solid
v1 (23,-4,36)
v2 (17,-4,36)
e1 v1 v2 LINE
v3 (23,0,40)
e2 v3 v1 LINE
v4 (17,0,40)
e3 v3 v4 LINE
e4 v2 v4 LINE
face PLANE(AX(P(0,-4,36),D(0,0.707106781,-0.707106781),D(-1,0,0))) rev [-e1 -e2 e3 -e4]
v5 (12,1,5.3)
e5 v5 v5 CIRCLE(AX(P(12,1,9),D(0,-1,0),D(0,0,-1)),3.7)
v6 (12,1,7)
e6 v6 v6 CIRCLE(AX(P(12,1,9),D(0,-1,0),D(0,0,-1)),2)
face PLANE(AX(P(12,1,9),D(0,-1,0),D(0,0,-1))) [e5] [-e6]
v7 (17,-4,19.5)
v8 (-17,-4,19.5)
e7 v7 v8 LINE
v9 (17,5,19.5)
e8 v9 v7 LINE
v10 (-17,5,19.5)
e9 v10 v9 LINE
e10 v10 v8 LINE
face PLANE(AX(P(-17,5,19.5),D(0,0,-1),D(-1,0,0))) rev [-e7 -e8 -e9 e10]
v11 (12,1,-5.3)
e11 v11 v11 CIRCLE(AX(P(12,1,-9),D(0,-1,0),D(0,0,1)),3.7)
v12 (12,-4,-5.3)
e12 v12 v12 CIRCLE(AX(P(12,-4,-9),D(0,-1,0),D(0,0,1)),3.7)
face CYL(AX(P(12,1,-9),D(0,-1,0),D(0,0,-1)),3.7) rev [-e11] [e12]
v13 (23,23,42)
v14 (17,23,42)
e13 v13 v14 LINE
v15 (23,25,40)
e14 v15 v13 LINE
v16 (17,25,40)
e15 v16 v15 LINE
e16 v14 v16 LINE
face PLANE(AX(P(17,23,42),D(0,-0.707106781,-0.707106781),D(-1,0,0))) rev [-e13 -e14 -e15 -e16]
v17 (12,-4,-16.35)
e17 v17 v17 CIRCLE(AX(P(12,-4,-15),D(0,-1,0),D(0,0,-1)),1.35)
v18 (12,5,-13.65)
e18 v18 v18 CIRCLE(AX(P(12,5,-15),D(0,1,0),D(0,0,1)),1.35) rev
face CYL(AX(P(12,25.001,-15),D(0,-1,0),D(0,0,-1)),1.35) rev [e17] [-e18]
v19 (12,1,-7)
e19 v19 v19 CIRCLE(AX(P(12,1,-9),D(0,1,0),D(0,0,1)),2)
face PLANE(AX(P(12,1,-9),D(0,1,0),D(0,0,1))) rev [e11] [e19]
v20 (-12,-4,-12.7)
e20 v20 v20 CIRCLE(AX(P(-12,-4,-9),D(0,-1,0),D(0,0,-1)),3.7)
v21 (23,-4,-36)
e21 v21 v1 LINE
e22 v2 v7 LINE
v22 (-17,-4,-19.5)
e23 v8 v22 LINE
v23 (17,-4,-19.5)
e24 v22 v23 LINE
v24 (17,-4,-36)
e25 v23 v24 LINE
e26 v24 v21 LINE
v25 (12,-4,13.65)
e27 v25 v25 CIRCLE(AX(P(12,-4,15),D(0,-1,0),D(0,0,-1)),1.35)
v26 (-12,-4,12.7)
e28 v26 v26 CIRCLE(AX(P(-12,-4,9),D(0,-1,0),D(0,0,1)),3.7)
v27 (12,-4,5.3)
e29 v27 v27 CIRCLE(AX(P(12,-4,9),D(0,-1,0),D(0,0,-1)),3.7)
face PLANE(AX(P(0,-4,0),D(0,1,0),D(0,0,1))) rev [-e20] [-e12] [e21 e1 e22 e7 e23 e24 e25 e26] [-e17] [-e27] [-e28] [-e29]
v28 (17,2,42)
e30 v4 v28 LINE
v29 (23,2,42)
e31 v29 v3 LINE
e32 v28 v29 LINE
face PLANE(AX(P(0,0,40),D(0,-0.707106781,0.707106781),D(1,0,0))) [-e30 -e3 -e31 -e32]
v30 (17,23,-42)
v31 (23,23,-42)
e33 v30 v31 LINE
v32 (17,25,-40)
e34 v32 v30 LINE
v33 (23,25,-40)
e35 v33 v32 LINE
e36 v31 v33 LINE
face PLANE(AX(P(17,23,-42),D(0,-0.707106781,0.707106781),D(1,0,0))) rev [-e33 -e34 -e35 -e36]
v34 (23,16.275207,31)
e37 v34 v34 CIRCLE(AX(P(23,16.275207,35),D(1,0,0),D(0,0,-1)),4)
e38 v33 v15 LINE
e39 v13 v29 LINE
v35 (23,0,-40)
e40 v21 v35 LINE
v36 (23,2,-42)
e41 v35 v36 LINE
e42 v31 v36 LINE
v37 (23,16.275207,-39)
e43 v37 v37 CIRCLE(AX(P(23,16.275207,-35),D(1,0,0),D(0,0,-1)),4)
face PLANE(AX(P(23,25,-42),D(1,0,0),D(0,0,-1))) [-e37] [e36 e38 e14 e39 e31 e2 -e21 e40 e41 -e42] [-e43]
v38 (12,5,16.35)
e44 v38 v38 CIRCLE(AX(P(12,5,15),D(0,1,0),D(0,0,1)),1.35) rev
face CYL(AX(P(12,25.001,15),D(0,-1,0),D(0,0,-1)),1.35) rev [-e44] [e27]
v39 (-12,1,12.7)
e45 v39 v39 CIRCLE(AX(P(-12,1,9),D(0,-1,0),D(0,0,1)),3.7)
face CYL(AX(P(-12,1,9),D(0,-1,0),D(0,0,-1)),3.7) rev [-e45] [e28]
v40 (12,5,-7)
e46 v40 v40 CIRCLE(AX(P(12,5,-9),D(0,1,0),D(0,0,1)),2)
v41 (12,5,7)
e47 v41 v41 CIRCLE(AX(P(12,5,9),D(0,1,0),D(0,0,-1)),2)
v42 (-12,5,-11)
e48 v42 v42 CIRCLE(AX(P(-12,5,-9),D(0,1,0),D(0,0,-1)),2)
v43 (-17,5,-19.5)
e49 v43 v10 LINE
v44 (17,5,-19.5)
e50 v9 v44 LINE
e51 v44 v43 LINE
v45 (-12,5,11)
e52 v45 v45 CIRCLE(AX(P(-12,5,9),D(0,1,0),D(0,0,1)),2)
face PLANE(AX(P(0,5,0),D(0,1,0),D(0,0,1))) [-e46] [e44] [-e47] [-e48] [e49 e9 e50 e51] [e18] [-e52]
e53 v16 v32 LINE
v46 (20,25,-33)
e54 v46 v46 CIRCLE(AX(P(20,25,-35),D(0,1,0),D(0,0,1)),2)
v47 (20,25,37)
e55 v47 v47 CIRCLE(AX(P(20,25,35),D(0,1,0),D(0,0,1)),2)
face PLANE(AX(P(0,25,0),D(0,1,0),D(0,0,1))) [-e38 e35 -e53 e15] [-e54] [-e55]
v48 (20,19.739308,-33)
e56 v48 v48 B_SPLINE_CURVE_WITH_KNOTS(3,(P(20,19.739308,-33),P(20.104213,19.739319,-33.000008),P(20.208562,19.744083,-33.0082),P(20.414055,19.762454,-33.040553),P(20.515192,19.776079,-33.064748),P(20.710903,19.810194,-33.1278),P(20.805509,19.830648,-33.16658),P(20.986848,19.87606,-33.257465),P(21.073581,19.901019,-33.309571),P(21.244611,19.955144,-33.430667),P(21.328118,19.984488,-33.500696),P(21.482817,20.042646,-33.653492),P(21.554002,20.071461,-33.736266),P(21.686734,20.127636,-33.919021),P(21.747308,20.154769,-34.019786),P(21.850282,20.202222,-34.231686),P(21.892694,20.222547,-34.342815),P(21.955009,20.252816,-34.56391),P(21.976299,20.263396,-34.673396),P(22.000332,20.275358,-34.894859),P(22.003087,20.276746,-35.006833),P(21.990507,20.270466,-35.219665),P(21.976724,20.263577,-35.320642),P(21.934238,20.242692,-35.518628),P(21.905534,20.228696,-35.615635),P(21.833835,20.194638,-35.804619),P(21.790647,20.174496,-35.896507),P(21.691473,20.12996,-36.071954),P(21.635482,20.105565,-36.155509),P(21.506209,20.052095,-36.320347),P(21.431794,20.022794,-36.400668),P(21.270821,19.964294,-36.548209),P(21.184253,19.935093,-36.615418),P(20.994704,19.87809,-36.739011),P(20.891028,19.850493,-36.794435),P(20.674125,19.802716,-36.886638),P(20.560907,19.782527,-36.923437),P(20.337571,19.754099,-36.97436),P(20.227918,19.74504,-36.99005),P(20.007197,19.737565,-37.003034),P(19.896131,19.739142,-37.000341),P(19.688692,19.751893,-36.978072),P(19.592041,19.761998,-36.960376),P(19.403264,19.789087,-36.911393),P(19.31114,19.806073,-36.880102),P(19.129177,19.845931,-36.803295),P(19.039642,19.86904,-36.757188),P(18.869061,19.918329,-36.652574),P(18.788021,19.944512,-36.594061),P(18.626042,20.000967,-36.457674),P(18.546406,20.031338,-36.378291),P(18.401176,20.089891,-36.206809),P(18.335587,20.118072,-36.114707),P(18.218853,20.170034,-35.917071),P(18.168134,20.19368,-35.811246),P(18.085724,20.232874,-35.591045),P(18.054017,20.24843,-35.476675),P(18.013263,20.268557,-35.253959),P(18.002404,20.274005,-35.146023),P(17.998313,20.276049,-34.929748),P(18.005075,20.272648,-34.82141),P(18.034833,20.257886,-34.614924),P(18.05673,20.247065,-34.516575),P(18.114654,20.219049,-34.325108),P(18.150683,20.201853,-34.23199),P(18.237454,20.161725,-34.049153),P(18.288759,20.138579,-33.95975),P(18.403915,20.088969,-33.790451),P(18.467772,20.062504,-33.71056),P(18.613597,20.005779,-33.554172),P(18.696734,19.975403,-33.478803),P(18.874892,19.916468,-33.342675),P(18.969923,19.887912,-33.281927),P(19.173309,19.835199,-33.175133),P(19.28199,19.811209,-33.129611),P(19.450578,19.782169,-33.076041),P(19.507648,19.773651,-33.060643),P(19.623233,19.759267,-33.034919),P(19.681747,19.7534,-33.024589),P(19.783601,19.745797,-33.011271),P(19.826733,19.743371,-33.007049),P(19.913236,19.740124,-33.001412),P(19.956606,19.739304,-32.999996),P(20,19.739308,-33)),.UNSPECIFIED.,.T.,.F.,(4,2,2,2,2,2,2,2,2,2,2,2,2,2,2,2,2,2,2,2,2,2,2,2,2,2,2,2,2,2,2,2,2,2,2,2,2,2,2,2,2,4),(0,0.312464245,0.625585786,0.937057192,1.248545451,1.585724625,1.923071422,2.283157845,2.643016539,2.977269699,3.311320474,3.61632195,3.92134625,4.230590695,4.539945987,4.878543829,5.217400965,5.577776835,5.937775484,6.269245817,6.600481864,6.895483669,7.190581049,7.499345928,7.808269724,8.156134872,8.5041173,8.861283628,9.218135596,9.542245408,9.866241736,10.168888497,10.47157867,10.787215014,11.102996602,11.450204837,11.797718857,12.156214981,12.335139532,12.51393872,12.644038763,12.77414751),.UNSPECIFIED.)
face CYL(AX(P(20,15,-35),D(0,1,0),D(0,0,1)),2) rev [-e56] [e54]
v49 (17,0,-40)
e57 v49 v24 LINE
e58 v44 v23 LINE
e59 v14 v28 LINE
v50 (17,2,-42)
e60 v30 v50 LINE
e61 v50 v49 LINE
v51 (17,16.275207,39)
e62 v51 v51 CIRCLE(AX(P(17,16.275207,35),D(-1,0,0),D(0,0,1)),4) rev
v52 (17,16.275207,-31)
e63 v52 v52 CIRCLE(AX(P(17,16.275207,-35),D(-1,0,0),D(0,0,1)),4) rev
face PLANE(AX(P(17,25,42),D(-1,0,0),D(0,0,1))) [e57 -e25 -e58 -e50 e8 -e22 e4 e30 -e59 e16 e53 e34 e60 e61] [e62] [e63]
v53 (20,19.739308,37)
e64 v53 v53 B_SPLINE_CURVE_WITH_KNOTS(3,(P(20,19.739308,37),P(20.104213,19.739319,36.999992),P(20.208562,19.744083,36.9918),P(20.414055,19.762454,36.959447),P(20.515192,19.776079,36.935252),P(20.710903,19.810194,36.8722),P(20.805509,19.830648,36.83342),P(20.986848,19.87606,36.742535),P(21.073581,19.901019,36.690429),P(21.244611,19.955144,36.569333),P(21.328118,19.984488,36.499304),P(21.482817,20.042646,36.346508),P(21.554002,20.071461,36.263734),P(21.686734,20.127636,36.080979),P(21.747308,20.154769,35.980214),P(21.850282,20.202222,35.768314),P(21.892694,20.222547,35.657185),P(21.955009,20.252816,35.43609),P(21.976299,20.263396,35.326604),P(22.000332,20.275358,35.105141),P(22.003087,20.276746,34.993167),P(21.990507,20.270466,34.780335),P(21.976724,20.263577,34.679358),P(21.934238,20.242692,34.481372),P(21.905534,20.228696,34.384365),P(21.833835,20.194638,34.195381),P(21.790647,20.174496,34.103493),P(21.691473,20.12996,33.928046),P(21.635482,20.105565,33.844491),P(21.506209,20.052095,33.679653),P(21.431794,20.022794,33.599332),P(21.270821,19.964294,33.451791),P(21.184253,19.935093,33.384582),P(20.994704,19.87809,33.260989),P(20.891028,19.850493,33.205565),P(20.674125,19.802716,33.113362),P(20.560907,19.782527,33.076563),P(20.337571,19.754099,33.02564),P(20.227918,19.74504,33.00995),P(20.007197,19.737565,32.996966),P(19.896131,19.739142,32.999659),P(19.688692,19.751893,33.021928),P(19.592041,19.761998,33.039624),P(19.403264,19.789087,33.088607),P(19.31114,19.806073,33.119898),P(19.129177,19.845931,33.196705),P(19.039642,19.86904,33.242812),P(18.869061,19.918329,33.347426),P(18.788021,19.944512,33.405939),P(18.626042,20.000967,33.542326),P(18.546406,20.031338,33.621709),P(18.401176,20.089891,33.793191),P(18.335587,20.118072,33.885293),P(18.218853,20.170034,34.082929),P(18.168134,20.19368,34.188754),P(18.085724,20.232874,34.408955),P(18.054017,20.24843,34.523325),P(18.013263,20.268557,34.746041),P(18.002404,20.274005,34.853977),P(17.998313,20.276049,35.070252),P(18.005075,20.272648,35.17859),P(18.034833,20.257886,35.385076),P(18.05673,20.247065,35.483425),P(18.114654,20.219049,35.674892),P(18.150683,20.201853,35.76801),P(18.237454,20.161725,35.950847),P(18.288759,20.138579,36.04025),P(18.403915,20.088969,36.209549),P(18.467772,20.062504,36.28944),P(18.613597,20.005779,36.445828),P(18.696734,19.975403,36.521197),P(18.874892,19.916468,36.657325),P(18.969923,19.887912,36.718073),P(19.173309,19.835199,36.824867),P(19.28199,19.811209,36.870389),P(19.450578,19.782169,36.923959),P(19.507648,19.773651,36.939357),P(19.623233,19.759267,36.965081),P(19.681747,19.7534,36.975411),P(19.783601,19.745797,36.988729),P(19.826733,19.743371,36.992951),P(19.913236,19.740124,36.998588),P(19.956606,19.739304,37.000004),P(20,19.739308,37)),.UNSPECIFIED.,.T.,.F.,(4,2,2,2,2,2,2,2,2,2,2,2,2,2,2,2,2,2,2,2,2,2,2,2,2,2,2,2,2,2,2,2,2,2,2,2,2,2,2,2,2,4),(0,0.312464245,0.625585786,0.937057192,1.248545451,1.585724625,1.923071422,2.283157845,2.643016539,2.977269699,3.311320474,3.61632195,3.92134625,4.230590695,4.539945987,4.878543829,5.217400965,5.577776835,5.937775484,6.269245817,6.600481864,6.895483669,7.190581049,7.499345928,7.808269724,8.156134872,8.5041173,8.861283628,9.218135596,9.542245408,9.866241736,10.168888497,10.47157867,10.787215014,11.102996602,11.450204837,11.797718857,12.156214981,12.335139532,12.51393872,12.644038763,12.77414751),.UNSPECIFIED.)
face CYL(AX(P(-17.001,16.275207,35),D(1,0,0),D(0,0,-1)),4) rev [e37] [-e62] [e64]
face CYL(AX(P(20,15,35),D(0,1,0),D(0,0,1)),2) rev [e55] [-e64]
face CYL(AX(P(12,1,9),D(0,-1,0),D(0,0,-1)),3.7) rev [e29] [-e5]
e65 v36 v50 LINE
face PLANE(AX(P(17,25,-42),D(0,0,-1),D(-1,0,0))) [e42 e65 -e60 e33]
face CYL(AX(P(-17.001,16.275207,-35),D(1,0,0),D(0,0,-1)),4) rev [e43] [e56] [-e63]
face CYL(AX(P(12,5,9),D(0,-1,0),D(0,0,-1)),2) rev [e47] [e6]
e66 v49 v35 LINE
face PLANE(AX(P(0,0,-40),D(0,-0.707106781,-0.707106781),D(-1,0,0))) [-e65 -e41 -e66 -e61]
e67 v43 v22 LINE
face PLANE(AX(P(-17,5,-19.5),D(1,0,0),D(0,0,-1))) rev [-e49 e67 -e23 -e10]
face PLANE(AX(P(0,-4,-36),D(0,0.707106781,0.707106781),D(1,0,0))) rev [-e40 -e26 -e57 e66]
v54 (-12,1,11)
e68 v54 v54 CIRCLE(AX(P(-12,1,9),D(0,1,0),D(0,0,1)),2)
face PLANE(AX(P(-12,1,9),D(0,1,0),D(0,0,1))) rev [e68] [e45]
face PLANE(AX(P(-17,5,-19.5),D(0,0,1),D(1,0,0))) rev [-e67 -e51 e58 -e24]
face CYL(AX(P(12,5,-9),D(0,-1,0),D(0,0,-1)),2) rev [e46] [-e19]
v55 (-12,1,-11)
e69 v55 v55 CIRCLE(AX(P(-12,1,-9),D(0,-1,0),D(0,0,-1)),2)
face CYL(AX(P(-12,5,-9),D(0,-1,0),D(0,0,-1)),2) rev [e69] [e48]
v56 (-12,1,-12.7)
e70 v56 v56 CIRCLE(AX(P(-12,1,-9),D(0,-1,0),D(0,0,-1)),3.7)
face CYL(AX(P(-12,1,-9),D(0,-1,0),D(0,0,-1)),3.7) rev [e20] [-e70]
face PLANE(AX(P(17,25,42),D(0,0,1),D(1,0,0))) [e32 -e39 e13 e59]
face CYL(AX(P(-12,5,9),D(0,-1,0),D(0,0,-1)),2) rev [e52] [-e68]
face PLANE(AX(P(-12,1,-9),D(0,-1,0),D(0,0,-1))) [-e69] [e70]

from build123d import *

# Parameters (mm, degrees)
SKETCH1_W           = 34
SKETCH1_H           = 39
SKETCH1_R           = 2
BOSS_EXTRUDE1_DEPTH = 5
SKETCH2_W           = 6
SKETCH2_H           = 84
BOSS_EXTRUDE2_DEPTH = 25
CUT_EXTRUDE2_REACH  = 65.159
SKETCH3_R           = 4
CHAMFER1_SIZE       = 2
SKETCH4_R           = 2
CUT_EXTRUDE3_DEPTH  = 10
BOSS_EXTRUDE3_DEPTH = 4
SKETCH6_R           = 3.7
CUT_EXTRUDE4_DEPTH  = 5
CHAMFER2_SIZE       = 4
CUT_EXTRUDE5_REACH  = 57.982
SKETCH7_R           = 1.35


with BuildPart() as part:
    # Sketch1 → Boss-Extrude1 (new body)
    with BuildSketch(Plane(origin=(0, 0, 0), x_dir=(1, 0, 0), z_dir=(0, 1, 0))):
        Rectangle(SKETCH1_W, SKETCH1_H)
        with Locations(Location((-12, -9, 0), (0, 0, 270))):
            Circle(SKETCH1_R, mode=Mode.SUBTRACT)
        with Locations(Location((12, -9, 0), (0, 0, 90))):
            Circle(SKETCH1_R, mode=Mode.SUBTRACT)
        with Locations(Location((12, 9, 0), (0, 0, 270))):
            Circle(SKETCH1_R, mode=Mode.SUBTRACT)
        with Locations(Location((-12, 9, 0), (0, 0, 90))):
            Circle(SKETCH1_R, mode=Mode.SUBTRACT)
    extrude(amount=BOSS_EXTRUDE1_DEPTH)

    # Sketch2 → Boss-Extrude2 (add)
    with BuildSketch(Plane.XZ):
        with Locations((20, 0)):
            Rectangle(SKETCH2_W, SKETCH2_H)
    extrude(amount=-BOSS_EXTRUDE2_DEPTH)

    # Sketch3 → Cut-Extrude2 (cut, up to next)
    with BuildSketch(Plane(origin=(23, 0, 0), x_dir=(0, 0, -1), z_dir=(1, 0, 0)), mode=Mode.PRIVATE) as cut_extrude2_sk1:
        with Locations((-35, 16.275206728)):
            Circle(SKETCH3_R)
    cut_extrude2_tool1 = extrude(cut_extrude2_sk1.sketch, amount=-CUT_EXTRUDE2_REACH, mode=Mode.PRIVATE) & part.part
    # Sketch3 → Cut-Extrude2 (cut, up to next)
    with BuildSketch(Plane(origin=(23, 0, 0), x_dir=(0, 0, -1), z_dir=(1, 0, 0)), mode=Mode.PRIVATE) as cut_extrude2_sk2:
        with Locations((35, 16.275206728)):
            Circle(SKETCH3_R)
    cut_extrude2_tool2 = extrude(cut_extrude2_sk2.sketch, amount=-CUT_EXTRUDE2_REACH, mode=Mode.PRIVATE) & part.part
    add(cut_extrude2_tool1.solids().sort_by_distance((23, 16.275207, 35))[0], mode=Mode.SUBTRACT)
    add(cut_extrude2_tool2.solids().sort_by_distance((23, 16.275207, -35))[0], mode=Mode.SUBTRACT)

    # Chamfer1
    chamfer1_edges = [part.edges().sort_by_distance(p)[0] for p in [
        (20, 25, -42),
        (20, 25, 42),
        (20, 0, 42),
        (20, 0, -42),
    ]]
    chamfer(chamfer1_edges, length=CHAMFER1_SIZE)

    # Sketch4 → Cut-Extrude3 (cut)
    with BuildSketch(Plane(origin=(0, 25, 0), x_dir=(1, 0, 0), z_dir=(0, 1, 0))):
        with Locations(Location((20, 35, 0), (0, 0, 270))):
            Circle(SKETCH4_R)
        with Locations(Location((20, -35, 0), (0, 0, 270))):
            Circle(SKETCH4_R)
    extrude(amount=-CUT_EXTRUDE3_DEPTH, mode=Mode.SUBTRACT)

    # Sketch5 → Boss-Extrude3 (add)
    with BuildSketch(Plane.XZ):
        Polygon((17, -19.5), (17, -40), (23, -40), (23, 40), (17, 40), (17, 19.5), (-17, 19.5), (-17, -19.5), align=None)
    extrude(amount=BOSS_EXTRUDE3_DEPTH)

    # Sketch6 → Cut-Extrude4 (cut)
    with BuildSketch(Plane.XZ.offset(4)):
        with Locations(Location((-12, -9, 0), (0, 0, 270))):
            Circle(SKETCH6_R)
        with Locations(Location((12, -9, 0), (0, 0, 90))):
            Circle(SKETCH6_R)
        with Locations(Location((12, 9, 0), (0, 0, 270))):
            Circle(SKETCH6_R)
        with Locations(Location((-12, 9, 0), (0, 0, 90))):
            Circle(SKETCH6_R)
    extrude(amount=-CUT_EXTRUDE4_DEPTH, mode=Mode.SUBTRACT)

    # Chamfer2
    chamfer2_edges = [part.edges().sort_by_distance(p)[0] for p in [
        (20, -4, 40),
        (20, -4, -40),
    ]]
    chamfer(chamfer2_edges, length=CHAMFER2_SIZE - 0.0001)  # a hair under: the kernel refuses the full size

    # Sketch7 → Cut-Extrude5 (cut, up to next)
    with BuildSketch(Plane.XZ.offset(4), mode=Mode.PRIVATE) as cut_extrude5_sk1:
        with Locations(Location((12, 15, 0), (0, 0, 270))):
            Circle(SKETCH7_R)
    cut_extrude5_tool1 = extrude(cut_extrude5_sk1.sketch, amount=-CUT_EXTRUDE5_REACH, mode=Mode.PRIVATE) & part.part
    # Sketch7 → Cut-Extrude5 (cut, up to next)
    with BuildSketch(Plane.XZ.offset(4), mode=Mode.PRIVATE) as cut_extrude5_sk2:
        with Locations(Location((12, -15, 0), (0, 0, 270))):
            Circle(SKETCH7_R)
    cut_extrude5_tool2 = extrude(cut_extrude5_sk2.sketch, amount=-CUT_EXTRUDE5_REACH, mode=Mode.PRIVATE) & part.part
    add(cut_extrude5_tool1.solids().sort_by_distance((12, -4, 15))[0], mode=Mode.SUBTRACT)
    add(cut_extrude5_tool2.solids().sort_by_distance((12, -4, -15))[0], mode=Mode.SUBTRACT)


solid = part.part
